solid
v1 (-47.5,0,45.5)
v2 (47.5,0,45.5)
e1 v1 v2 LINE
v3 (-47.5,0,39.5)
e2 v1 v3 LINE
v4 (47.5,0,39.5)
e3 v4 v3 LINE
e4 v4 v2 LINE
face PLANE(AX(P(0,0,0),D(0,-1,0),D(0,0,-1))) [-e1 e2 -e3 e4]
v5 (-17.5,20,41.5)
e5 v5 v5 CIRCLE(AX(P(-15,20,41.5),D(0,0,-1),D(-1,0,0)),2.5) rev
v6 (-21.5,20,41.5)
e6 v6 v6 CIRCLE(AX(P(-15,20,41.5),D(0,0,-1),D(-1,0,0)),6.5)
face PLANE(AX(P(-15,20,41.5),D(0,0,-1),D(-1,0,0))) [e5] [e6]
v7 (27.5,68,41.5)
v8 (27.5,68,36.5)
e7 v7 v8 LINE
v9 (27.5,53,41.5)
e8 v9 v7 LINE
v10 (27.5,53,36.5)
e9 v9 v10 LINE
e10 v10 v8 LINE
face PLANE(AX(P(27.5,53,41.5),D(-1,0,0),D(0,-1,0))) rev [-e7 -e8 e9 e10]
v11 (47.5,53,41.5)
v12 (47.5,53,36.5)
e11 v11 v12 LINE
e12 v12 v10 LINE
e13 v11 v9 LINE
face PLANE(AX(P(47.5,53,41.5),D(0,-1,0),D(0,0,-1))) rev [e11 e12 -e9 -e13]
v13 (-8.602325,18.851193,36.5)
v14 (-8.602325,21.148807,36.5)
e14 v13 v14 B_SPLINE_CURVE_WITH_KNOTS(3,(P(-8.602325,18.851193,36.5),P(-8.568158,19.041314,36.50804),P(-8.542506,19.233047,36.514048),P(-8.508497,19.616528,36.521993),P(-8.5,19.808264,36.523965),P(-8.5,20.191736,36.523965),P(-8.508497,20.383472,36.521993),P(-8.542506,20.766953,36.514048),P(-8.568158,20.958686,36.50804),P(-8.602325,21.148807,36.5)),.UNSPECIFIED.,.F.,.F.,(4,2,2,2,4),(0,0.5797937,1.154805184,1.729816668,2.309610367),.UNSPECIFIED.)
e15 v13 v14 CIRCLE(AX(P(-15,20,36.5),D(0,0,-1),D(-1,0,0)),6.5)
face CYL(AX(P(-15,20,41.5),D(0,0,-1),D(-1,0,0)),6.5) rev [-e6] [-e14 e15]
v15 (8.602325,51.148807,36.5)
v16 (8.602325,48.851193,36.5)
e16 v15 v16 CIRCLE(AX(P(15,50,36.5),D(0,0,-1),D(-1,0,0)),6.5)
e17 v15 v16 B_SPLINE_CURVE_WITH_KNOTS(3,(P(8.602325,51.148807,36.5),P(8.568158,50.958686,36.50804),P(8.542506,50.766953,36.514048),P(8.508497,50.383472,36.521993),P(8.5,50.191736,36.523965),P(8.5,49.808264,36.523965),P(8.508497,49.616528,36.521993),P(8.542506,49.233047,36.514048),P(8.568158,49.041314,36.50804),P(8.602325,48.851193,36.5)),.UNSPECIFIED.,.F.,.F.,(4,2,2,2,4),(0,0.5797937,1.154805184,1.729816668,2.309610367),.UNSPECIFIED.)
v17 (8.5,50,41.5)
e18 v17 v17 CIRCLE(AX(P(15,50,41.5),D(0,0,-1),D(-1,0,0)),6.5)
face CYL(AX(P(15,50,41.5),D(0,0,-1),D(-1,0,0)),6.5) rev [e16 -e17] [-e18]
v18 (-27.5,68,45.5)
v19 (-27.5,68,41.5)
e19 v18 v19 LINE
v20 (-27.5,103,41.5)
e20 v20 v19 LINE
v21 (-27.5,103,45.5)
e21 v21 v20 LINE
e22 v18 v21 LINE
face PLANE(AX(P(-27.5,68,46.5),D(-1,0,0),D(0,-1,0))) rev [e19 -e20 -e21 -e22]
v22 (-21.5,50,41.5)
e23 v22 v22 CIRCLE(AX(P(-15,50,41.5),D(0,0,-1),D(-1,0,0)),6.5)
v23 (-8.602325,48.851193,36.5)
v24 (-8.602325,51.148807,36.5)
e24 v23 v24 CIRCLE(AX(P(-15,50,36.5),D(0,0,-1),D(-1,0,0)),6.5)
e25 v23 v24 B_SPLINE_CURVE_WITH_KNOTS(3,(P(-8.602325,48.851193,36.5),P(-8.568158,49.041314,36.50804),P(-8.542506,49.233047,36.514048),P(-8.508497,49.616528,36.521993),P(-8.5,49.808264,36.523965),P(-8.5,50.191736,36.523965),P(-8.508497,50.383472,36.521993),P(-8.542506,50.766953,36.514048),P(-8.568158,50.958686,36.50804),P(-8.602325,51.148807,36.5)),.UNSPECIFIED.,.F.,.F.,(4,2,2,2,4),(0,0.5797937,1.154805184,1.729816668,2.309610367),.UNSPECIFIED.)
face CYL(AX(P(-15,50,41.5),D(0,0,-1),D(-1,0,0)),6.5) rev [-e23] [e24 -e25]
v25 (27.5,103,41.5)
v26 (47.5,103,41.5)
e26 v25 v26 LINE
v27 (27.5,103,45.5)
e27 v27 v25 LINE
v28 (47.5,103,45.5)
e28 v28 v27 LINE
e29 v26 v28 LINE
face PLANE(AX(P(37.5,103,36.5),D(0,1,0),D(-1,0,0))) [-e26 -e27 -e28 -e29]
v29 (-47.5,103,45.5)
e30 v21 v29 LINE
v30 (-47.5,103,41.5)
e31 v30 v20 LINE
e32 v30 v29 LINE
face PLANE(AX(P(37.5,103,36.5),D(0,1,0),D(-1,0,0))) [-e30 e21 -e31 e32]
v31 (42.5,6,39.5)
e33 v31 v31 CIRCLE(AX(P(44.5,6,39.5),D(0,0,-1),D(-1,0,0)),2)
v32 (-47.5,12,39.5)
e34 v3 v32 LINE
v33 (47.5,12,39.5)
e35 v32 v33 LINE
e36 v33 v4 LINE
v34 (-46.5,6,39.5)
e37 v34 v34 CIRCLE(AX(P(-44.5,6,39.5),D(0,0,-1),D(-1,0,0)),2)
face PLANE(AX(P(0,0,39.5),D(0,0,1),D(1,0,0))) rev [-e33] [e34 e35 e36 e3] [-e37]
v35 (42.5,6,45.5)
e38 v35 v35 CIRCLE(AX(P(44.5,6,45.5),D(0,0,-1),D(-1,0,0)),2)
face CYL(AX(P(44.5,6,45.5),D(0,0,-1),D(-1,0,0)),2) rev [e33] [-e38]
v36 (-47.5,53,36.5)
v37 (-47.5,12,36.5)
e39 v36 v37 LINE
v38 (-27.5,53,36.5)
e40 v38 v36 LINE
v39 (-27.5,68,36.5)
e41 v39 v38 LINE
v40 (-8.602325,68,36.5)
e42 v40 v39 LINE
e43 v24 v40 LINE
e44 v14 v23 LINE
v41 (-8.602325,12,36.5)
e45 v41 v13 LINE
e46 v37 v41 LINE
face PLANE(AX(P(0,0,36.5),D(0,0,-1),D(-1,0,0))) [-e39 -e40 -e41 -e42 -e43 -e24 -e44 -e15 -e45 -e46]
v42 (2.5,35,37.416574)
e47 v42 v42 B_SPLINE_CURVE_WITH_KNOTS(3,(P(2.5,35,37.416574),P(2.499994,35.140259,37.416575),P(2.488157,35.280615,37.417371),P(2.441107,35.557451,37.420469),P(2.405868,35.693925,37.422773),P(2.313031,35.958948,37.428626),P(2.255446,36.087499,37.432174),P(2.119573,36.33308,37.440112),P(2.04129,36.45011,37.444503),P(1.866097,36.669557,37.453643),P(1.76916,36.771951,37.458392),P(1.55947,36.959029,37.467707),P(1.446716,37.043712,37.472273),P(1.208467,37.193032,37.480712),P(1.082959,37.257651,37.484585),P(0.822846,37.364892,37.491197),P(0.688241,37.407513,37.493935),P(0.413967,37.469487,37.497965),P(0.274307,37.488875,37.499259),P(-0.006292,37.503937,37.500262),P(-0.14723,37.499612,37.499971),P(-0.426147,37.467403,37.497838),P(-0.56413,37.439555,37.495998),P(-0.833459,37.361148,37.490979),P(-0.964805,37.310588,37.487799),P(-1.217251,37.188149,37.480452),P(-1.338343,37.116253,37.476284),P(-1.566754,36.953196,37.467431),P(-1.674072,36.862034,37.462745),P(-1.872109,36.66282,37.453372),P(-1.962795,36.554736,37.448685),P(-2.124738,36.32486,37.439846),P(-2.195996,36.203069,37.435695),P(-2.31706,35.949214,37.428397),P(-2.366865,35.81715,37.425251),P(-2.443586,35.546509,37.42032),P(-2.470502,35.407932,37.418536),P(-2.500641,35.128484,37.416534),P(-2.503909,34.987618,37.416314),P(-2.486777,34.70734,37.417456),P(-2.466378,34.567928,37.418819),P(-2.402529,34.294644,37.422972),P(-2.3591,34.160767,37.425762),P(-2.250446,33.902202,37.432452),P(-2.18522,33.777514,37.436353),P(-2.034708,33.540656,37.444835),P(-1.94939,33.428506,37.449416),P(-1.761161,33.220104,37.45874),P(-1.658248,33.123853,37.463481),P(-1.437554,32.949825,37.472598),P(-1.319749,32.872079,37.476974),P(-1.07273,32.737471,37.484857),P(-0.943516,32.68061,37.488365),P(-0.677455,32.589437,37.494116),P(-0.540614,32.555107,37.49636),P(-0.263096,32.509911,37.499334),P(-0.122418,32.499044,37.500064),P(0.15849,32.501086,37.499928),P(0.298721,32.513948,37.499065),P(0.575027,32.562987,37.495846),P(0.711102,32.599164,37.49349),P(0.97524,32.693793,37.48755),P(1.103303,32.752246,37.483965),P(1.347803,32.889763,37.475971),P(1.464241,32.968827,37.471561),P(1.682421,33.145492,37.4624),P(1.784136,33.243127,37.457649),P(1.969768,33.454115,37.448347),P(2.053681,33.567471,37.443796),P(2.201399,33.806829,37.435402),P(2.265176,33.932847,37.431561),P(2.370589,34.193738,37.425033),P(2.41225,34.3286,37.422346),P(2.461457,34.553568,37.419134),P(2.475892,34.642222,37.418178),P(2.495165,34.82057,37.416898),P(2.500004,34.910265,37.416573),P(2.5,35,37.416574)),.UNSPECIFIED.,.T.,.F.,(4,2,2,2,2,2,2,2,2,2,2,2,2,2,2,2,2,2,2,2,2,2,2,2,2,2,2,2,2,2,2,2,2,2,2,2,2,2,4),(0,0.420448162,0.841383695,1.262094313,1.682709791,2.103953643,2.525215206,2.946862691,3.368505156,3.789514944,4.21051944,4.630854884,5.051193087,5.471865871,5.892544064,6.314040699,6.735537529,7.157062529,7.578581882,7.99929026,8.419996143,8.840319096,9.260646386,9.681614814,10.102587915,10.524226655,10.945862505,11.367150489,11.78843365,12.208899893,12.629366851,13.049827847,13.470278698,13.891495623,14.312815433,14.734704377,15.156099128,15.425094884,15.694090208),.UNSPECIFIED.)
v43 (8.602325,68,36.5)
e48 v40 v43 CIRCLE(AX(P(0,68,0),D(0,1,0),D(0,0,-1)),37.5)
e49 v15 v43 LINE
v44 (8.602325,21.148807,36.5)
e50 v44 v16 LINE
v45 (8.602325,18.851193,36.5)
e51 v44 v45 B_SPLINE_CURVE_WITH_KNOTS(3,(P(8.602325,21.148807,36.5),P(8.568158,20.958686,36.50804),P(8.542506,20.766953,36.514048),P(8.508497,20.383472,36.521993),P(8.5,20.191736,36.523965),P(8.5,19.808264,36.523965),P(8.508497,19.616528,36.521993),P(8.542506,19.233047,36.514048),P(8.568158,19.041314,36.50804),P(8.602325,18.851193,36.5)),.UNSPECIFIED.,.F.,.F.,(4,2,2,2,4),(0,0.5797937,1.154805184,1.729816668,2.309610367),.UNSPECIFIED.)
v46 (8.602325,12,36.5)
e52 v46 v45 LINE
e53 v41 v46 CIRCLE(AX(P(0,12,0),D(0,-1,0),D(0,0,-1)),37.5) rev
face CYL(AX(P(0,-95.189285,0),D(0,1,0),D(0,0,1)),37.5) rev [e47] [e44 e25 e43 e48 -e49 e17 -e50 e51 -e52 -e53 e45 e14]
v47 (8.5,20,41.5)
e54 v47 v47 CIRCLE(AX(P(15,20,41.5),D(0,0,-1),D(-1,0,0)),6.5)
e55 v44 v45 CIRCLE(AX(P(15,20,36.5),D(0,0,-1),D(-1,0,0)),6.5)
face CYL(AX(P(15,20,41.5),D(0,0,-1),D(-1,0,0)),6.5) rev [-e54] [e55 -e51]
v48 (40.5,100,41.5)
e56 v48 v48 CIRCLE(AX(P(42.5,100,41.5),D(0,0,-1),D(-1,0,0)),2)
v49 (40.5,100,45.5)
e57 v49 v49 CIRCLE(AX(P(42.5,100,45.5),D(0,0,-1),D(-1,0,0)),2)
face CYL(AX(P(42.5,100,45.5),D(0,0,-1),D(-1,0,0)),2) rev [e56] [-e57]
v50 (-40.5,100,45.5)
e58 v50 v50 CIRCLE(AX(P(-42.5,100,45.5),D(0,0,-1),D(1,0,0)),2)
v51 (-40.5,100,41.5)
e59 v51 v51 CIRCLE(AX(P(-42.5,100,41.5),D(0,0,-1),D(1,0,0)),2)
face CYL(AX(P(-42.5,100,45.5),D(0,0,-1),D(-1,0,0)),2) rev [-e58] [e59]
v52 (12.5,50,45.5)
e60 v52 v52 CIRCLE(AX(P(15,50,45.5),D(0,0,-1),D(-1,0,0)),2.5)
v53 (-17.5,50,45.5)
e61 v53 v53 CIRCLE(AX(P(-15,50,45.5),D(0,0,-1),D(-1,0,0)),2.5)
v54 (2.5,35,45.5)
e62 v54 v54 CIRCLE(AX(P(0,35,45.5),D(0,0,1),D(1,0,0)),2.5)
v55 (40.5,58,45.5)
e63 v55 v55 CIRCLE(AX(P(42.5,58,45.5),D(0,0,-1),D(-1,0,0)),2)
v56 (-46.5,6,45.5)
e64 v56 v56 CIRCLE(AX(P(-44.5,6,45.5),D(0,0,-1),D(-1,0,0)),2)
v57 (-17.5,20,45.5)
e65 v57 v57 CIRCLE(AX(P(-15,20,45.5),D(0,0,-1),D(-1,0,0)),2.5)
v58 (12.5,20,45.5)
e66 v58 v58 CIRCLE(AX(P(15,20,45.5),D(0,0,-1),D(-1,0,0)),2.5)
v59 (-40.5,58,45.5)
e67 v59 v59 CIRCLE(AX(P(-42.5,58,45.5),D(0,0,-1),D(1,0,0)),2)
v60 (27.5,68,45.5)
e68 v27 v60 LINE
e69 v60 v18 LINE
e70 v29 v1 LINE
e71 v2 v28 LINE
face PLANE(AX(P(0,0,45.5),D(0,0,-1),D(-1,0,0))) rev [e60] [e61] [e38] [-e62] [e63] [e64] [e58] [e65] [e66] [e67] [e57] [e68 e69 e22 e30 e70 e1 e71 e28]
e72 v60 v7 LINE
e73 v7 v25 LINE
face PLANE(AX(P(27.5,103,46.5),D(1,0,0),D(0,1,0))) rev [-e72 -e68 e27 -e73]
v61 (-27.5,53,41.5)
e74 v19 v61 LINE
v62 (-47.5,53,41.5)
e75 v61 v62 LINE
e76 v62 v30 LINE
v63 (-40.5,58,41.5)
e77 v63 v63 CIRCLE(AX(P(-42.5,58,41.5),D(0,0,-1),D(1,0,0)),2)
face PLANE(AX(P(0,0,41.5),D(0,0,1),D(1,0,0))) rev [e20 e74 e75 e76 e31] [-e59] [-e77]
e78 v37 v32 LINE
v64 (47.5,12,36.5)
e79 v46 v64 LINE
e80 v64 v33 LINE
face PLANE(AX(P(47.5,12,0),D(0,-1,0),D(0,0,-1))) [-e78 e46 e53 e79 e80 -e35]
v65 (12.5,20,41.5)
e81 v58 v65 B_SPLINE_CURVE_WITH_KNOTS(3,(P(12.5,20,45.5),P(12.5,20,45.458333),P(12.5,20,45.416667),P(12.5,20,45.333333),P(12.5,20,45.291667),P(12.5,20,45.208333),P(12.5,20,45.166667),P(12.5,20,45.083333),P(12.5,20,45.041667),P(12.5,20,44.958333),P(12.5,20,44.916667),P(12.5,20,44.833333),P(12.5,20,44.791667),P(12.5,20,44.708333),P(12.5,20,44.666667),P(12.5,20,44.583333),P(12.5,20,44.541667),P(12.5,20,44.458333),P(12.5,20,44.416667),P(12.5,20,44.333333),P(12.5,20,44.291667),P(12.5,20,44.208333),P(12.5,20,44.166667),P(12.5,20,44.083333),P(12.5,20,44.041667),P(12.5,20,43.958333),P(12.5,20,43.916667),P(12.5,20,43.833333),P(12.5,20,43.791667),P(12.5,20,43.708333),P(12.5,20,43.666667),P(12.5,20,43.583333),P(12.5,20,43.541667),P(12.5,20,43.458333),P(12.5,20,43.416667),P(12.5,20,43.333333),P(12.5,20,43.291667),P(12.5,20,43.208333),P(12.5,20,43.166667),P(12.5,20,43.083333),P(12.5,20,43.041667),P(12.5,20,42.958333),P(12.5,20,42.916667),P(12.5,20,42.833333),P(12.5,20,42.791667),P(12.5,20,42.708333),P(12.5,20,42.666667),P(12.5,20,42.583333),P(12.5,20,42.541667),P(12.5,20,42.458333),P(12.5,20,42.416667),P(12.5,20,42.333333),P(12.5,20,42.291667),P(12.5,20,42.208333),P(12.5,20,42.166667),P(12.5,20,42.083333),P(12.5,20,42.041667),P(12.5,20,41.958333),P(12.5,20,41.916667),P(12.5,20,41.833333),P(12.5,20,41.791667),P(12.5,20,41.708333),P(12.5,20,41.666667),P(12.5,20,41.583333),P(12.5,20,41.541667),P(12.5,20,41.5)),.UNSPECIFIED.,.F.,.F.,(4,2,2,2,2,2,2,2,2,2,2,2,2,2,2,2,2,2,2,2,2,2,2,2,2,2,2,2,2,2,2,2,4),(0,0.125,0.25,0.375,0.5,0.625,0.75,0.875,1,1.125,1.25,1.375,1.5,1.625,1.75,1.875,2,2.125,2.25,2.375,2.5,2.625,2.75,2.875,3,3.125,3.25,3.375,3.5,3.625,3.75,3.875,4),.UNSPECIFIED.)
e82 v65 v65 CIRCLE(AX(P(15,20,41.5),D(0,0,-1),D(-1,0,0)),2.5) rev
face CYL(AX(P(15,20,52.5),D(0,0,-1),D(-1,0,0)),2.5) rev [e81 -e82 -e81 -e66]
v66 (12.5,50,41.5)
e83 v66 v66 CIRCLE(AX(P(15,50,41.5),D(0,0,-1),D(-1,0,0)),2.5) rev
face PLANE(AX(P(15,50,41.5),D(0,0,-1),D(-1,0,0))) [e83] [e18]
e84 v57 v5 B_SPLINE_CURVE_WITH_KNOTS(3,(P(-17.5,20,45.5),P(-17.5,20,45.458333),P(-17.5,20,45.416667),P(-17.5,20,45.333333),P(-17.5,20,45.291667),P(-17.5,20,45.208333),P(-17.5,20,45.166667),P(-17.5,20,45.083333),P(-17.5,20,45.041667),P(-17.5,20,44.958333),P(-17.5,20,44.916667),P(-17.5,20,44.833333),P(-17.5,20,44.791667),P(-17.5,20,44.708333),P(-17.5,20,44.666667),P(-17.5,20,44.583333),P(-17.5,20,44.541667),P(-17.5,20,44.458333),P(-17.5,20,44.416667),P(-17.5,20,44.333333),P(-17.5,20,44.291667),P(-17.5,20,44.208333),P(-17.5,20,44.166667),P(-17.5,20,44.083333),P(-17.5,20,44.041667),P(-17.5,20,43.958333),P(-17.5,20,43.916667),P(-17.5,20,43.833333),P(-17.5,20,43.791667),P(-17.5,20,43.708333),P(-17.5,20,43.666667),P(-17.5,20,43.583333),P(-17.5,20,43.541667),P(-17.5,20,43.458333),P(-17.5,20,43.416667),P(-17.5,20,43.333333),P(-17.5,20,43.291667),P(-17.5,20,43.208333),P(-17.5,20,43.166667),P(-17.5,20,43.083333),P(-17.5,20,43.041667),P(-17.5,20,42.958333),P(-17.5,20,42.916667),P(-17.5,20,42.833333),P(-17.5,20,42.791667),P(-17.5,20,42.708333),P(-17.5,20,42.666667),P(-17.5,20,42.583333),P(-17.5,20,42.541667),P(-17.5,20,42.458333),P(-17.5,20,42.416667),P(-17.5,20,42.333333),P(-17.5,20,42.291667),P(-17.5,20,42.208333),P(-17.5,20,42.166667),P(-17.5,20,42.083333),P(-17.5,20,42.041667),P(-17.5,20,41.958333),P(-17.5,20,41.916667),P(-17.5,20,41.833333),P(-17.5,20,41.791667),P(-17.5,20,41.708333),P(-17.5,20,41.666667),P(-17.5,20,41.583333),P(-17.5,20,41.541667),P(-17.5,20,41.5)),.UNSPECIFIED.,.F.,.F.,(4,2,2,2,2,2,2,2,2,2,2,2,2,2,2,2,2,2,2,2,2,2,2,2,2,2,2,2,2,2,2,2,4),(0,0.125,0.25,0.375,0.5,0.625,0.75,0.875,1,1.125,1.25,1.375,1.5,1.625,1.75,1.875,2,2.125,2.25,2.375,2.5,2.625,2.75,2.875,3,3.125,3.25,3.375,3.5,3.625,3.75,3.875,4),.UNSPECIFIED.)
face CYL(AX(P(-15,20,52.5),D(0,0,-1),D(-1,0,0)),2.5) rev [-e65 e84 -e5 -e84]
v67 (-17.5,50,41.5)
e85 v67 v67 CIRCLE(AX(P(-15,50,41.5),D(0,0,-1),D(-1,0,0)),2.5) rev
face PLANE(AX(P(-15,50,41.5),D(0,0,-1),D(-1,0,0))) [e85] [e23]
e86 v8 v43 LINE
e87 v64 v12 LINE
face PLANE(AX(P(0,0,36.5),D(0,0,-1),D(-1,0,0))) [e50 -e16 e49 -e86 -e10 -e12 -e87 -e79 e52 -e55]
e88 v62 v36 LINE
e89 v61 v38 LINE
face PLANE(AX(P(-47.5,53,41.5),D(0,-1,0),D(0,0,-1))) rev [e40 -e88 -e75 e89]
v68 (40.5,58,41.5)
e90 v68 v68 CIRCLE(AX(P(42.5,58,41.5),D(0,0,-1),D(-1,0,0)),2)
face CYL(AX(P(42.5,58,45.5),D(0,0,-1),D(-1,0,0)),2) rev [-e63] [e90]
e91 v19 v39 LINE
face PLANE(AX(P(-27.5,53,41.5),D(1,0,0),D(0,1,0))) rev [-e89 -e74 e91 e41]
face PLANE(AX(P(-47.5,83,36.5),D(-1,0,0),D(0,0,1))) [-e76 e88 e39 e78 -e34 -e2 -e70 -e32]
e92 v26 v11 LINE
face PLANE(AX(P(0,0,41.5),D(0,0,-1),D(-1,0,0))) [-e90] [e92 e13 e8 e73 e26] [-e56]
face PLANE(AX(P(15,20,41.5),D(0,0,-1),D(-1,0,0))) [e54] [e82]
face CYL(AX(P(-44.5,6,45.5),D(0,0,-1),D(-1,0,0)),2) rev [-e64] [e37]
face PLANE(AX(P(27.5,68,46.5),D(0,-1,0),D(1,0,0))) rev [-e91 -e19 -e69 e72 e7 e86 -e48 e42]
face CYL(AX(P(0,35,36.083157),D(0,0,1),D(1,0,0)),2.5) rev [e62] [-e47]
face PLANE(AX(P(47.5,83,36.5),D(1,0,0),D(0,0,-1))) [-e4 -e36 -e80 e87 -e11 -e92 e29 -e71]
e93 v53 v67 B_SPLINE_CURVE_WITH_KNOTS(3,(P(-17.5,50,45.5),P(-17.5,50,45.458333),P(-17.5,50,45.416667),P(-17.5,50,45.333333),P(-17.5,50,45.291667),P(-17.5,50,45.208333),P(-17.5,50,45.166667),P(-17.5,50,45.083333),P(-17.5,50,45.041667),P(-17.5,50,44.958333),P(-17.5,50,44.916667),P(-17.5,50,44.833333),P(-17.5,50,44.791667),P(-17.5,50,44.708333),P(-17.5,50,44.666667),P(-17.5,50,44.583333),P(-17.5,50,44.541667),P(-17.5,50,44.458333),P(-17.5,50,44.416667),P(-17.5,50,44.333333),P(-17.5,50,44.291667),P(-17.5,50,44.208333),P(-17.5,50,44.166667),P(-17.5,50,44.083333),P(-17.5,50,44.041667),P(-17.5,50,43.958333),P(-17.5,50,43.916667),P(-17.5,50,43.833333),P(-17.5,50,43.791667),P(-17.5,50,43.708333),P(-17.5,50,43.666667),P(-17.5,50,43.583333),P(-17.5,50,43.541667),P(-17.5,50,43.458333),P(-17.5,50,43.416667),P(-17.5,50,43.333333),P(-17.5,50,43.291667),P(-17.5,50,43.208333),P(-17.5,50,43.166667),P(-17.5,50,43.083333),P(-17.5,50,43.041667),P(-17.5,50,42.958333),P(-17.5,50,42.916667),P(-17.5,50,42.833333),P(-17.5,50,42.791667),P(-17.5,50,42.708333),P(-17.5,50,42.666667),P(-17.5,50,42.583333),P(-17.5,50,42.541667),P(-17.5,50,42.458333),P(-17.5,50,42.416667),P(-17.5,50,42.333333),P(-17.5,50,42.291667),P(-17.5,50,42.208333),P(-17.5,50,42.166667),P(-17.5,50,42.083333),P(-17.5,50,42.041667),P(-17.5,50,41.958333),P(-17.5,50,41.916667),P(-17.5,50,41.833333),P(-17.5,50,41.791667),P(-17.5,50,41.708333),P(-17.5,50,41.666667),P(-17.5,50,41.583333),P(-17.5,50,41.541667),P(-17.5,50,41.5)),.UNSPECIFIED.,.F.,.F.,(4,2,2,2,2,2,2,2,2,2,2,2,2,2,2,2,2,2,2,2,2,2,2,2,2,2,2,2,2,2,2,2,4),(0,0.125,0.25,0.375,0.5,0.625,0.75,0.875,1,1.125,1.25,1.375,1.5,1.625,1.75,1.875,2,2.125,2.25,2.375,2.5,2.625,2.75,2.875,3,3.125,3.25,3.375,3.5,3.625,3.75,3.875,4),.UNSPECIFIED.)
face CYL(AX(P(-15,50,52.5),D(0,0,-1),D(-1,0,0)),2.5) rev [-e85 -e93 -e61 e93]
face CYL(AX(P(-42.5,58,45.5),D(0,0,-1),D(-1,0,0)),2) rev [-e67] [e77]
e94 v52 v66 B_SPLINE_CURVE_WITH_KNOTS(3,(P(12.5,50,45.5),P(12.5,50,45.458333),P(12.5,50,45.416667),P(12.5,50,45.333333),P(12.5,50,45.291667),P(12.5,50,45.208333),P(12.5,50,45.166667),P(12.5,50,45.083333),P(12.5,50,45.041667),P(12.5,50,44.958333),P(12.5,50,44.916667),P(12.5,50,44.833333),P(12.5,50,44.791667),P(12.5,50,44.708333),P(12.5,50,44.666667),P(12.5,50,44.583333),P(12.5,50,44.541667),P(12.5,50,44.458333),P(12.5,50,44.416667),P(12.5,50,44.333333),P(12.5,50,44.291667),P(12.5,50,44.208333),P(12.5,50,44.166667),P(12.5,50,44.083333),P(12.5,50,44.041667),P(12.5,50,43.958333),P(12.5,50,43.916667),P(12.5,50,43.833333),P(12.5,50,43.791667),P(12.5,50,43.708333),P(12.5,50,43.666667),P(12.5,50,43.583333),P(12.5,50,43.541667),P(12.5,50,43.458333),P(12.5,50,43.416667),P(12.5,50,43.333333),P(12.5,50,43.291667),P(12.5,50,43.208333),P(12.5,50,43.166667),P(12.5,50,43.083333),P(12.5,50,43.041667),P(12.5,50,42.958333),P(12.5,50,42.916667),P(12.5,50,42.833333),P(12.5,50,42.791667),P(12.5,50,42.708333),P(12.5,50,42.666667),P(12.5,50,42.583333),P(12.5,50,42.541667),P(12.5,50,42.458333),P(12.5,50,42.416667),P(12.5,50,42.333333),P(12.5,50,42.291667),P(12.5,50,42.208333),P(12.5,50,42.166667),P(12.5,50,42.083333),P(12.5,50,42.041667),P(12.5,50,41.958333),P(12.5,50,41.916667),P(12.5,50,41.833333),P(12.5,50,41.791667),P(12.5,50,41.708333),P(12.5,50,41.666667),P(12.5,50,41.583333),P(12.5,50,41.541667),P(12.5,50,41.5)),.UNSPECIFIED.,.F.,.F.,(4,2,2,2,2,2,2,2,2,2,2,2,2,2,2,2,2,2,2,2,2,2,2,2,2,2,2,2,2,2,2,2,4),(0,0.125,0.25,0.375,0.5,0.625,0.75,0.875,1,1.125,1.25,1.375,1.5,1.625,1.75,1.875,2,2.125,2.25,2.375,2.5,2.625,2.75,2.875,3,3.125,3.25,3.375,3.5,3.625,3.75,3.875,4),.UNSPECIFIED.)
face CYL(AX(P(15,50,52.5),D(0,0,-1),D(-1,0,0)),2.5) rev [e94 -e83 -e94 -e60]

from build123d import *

# Parameters (mm, degrees)
SKETCH1_R                = 37.5
BOSS_EXTRUDE1_DEPTH      = 12
SKETCH2_R                = 30
BOSS_EXTRUDE2_DEPTH      = 56
BOSS_EXTRUDE3_DEPTH      = 5
BOSS_EXTRUDE3_DEPTH_BACK = 1
SKETCH4_W                = 75
SKETCH4_H                = 15
SKETCH4_R                = 3.5
MOVE_FACE3_BY            = 10
MOVE_FACE3_2_BY          = 10
BOSS_EXTRUDE4_DEPTH      = 12
BOSS_EXTRUDE5_DEPTH      = 68
MOVE_START               = 42.5
MOVE_FACE1_OUTLINE_W     = 95
MOVE_FACE1_OUTLINE_H     = 83
MOVE_FACE1_OUTLINE_R     = 3.5
MOVE_FACE1_DEPTH         = 10
SKETCH11_W               = 95
SKETCH11_H               = 15
BOSS_EXTRUDE7_DEPTH      = 20
CUT_EXTRUDE1_DEPTH       = 103.720494547
CUT_EXTRUDE1_DEPTH_BACK  = 103.720494547
SKETCH12_R               = 2.5
SKETCH13_R               = 6.5
CUT_EXTRUDE2_DEPTH       = 5
MOVE_FACE2_BY            = 7
DELETEFACE1_START        = -20
DELETEFACE1_OUTLINE_W    = 95
DELETEFACE1_OUTLINE_H    = 8
DELETEFACE1_DEPTH        = 20
CUT_EXTRUDE3_DEPTH       = 103.359660059
CUT_EXTRUDE3_DEPTH_BACK  = 3
SKETCH15_R               = 2
CUT_EXTRUDE4_DEPTH       = 96.818839484
MOVE_FACE4_BY            = 20
SKETCH16_W               = 55
SKETCH16_H               = 35
CUT_EXTRUDE5_DEPTH       = 10
SKETCH17_W               = 20
SKETCH17_H               = 50
CUT_EXTRUDE6_DEPTH       = 5
SKETCH18_R               = 2
CUT_EXTRUDE7_DEPTH       = 114.535236825
SKETCH19_R               = 2.5
CUT_EXTRUDE8_DEPTH       = 114.781589028


# Read off the part's stored shape, not the designer's step: Move Face1, DeleteFace1
with BuildPart() as part:
    # Sketch1 → Boss-Extrude1 (new body)
    with BuildSketch(Plane(origin=(0, 0, 0), x_dir=(1, 0, 0), z_dir=(0, 1, 0))):
        with Locations(Location((0, 0, 0), (0, 0, 270))):
            Circle(SKETCH1_R)
    extrude(amount=BOSS_EXTRUDE1_DEPTH)

    # Sketch2 → Boss-Extrude2 (add)
    with BuildSketch(Plane(origin=(0, 12, 0), x_dir=(1, 0, 0), z_dir=(0, 1, 0))):
        with Locations(Location((0, 0, 0), (0, 0, 270))):
            Circle(SKETCH2_R)
    extrude(amount=BOSS_EXTRUDE2_DEPTH)


with BuildPart() as body_2:
    # Sketch4 → Boss-Extrude3 (new, two sides: drawn at the far end of the back side and taken through both)
    with BuildSketch(Plane.XY.offset(37.5).offset(-BOSS_EXTRUDE3_DEPTH_BACK)):
        with Locations((0, 75.5)):
            Rectangle(SKETCH4_W, SKETCH4_H)
        with Locations((0, 76)):
            Circle(SKETCH4_R, mode=Mode.SUBTRACT)
    extrude(amount=BOSS_EXTRUDE3_DEPTH + BOSS_EXTRUDE3_DEPTH_BACK)

    # Move Face3: a face moved outward by 10.0
    extrude(body_2.faces().sort_by_distance((-37.5, 75.5, 39.5))[0], amount=MOVE_FACE3_BY, dir=(-1, 0, 0))

    # Move Face3 2: a face moved outward by 10.0
    extrude(body_2.faces().sort_by_distance((37.5, 75.5, 39.5))[0], amount=MOVE_FACE3_2_BY, dir=(1, 0, 0))



with BuildPart() as body_3:
    # Sketch6 → Boss-Extrude4 (new body)
    with BuildSketch(Plane.XZ):
        with BuildLine():
            Line((42.5, 0), (37.5, 0))
            ThreePointArc((37.5, 0), (0, 37.5), (-37.5, 0))
            Line((-37.5, 0), (-42.5, 0))
            ThreePointArc((-42.5, 0), (0, 42.5), (42.5, 0))
        make_face()
    extrude(amount=-BOSS_EXTRUDE4_DEPTH)


with BuildPart() as body_2_1:
    add(body_2.part)

    add(body_3.part)  # Boss-Extrude5 merges body 3
    # Sketch7 → Boss-Extrude5 (add)
    with BuildSketch(Plane.XZ.offset(-68)):
        with BuildLine():
            Line((8.602325267, 36.5), (47.5, 36.5))
            Line((47.5, 36.5), (47.5, 42.5))
            Line((47.5, 42.5), (-47.5, 42.5))
            Line((-47.5, 42.5), (-47.5, 36.5))
            Line((-47.5, 36.5), (-8.602325267, 36.5))
            ThreePointArc((-8.602325267, 36.5), (0, 37.5), (8.602325267, 36.5))
        make_face()
    extrude(amount=BOSS_EXTRUDE5_DEPTH)

    # Move Face1 outline → Move Face1 (add)
    with BuildSketch(Plane.XY.offset(MOVE_START)):
        with Locations((0, 41.5)):
            Rectangle(MOVE_FACE1_OUTLINE_W, MOVE_FACE1_OUTLINE_H)
        with Locations((0, 76)):
            Circle(MOVE_FACE1_OUTLINE_R, mode=Mode.SUBTRACT)
    extrude(amount=MOVE_FACE1_DEPTH)

    # Sketch11 → Boss-Extrude7 (add)
    with BuildSketch(Plane.XZ):
        with Locations((0, 45)):
            Rectangle(SKETCH11_W, SKETCH11_H)
    extrude(amount=BOSS_EXTRUDE7_DEPTH)

    # Sketch12 → Cut-Extrude1 (cut, two sides: drawn at the far end of the back side and taken through both)
    with BuildSketch(Plane(origin=(0, 0, 37.5), x_dir=(-1, 0, 0), z_dir=(0, 0, -1)).offset(-CUT_EXTRUDE1_DEPTH_BACK)):
        with Locations((-15, 20)):
            Circle(SKETCH12_R)
        with Locations((15, 20)):
            Circle(SKETCH12_R)
        with Locations((-15, 50)):
            Circle(SKETCH12_R)
        with Locations((15, 50)):
            Circle(SKETCH12_R)
    extrude(amount=CUT_EXTRUDE1_DEPTH + CUT_EXTRUDE1_DEPTH_BACK, mode=Mode.SUBTRACT)

    # Sketch13 → Cut-Extrude2 (cut)
    with BuildSketch(Plane(origin=(0, 0, 36.5), x_dir=(-1, 0, 0), z_dir=(0, 0, -1))):
        with Locations((-15, 50)):
            Circle(SKETCH13_R)
        with Locations((15, 50)):
            Circle(SKETCH13_R)
        with Locations((-15, 20)):
            Circle(SKETCH13_R)
        with Locations((15, 20)):
            Circle(SKETCH13_R)
    extrude(amount=-CUT_EXTRUDE2_DEPTH, mode=Mode.SUBTRACT)

    # Move Face2: a face moved inward by 7.0
    extrude(body_2_1.faces().sort_by_distance((0, 31.294429556, 52.5))[0], amount=MOVE_FACE2_BY, dir=(0, 0, -1), mode=Mode.SUBTRACT)

    # DeleteFace1 outline → DeleteFace1 (cut)
    with BuildSketch(Plane(origin=(0, 0, 0), x_dir=(1, 0, 0), z_dir=(0, 1, 0)).offset(DELETEFACE1_START)):
        with Locations((0, -41.5)):
            Rectangle(DELETEFACE1_OUTLINE_W, DELETEFACE1_OUTLINE_H)
    extrude(amount=DELETEFACE1_DEPTH, mode=Mode.SUBTRACT)

    # Sketch14 → Cut-Extrude3 (cut, two sides: drawn at the far end of the back side and taken through both)
    with BuildSketch(Plane(origin=(0, 0, 36.5), x_dir=(-1, 0, 0), z_dir=(0, 0, -1)).offset(-CUT_EXTRUDE3_DEPTH_BACK)):
        Polygon((47.5, 0), (-42.5, 0), (-47.5, 0), (-47.5, 12), (-42.5, 12), (47.5, 12), align=None)
    extrude(amount=CUT_EXTRUDE3_DEPTH + CUT_EXTRUDE3_DEPTH_BACK, mode=Mode.SUBTRACT)

    # Sketch15 → Cut-Extrude4 (cut, through all)
    with BuildSketch(Plane(origin=(0, 0, 39.5), x_dir=(-1, 0, 0), z_dir=(0, 0, -1))):
        with Locations((44.5, 6)):
            Circle(SKETCH15_R)
        with Locations((-44.5, 6)):
            Circle(SKETCH15_R)
    extrude(amount=-CUT_EXTRUDE4_DEPTH, mode=Mode.SUBTRACT)

    # Move Face4: a face moved outward by 20.0
    extrude(body_2_1.faces().sort_by_distance((0, 83, 41))[0], amount=MOVE_FACE4_BY, dir=(0, 1, 0))

    # Sketch16 → Cut-Extrude5 (cut)
    with BuildSketch(Plane(origin=(0, 0, 36.5), x_dir=(-1, 0, 0), z_dir=(0, 0, -1))):
        with Locations((0, 85.5)):
            Rectangle(SKETCH16_W, SKETCH16_H)
    extrude(amount=-CUT_EXTRUDE5_DEPTH, mode=Mode.SUBTRACT)

    # Sketch17 → Cut-Extrude6 (cut)
    with BuildSketch(Plane(origin=(0, 0, 36.5), x_dir=(-1, 0, 0), z_dir=(0, 0, -1))):
        with Locations((37.5, 78)):
            Rectangle(SKETCH17_W, SKETCH17_H)
        with Locations((-37.5, 78)):
            Rectangle(SKETCH17_W, SKETCH17_H)
    extrude(amount=-CUT_EXTRUDE6_DEPTH, mode=Mode.SUBTRACT)

    # Sketch18 → Cut-Extrude7 (cut, through all)
    with BuildSketch(Plane(origin=(0, 0, 41.5), x_dir=(-1, 0, 0), z_dir=(0, 0, -1))):
        with Locations((-42.5, 58)):
            Circle(SKETCH18_R)
        with Locations((-42.5, 100)):
            Circle(SKETCH18_R)
        with Locations(Location((42.5, 100, 0), (0, 0, 180))):
            Circle(SKETCH18_R)
        with Locations(Location((42.5, 58, 0), (0, 0, 180))):
            Circle(SKETCH18_R)
    extrude(amount=-CUT_EXTRUDE7_DEPTH, mode=Mode.SUBTRACT)

    # Sketch19 → Cut-Extrude8 (cut, through all)
    with BuildSketch(Plane.XY.offset(45.5)):
        with Locations((0, 35)):
            Circle(SKETCH19_R)
    extrude(amount=-CUT_EXTRUDE8_DEPTH, mode=Mode.SUBTRACT)


solid = body_2_1.part
